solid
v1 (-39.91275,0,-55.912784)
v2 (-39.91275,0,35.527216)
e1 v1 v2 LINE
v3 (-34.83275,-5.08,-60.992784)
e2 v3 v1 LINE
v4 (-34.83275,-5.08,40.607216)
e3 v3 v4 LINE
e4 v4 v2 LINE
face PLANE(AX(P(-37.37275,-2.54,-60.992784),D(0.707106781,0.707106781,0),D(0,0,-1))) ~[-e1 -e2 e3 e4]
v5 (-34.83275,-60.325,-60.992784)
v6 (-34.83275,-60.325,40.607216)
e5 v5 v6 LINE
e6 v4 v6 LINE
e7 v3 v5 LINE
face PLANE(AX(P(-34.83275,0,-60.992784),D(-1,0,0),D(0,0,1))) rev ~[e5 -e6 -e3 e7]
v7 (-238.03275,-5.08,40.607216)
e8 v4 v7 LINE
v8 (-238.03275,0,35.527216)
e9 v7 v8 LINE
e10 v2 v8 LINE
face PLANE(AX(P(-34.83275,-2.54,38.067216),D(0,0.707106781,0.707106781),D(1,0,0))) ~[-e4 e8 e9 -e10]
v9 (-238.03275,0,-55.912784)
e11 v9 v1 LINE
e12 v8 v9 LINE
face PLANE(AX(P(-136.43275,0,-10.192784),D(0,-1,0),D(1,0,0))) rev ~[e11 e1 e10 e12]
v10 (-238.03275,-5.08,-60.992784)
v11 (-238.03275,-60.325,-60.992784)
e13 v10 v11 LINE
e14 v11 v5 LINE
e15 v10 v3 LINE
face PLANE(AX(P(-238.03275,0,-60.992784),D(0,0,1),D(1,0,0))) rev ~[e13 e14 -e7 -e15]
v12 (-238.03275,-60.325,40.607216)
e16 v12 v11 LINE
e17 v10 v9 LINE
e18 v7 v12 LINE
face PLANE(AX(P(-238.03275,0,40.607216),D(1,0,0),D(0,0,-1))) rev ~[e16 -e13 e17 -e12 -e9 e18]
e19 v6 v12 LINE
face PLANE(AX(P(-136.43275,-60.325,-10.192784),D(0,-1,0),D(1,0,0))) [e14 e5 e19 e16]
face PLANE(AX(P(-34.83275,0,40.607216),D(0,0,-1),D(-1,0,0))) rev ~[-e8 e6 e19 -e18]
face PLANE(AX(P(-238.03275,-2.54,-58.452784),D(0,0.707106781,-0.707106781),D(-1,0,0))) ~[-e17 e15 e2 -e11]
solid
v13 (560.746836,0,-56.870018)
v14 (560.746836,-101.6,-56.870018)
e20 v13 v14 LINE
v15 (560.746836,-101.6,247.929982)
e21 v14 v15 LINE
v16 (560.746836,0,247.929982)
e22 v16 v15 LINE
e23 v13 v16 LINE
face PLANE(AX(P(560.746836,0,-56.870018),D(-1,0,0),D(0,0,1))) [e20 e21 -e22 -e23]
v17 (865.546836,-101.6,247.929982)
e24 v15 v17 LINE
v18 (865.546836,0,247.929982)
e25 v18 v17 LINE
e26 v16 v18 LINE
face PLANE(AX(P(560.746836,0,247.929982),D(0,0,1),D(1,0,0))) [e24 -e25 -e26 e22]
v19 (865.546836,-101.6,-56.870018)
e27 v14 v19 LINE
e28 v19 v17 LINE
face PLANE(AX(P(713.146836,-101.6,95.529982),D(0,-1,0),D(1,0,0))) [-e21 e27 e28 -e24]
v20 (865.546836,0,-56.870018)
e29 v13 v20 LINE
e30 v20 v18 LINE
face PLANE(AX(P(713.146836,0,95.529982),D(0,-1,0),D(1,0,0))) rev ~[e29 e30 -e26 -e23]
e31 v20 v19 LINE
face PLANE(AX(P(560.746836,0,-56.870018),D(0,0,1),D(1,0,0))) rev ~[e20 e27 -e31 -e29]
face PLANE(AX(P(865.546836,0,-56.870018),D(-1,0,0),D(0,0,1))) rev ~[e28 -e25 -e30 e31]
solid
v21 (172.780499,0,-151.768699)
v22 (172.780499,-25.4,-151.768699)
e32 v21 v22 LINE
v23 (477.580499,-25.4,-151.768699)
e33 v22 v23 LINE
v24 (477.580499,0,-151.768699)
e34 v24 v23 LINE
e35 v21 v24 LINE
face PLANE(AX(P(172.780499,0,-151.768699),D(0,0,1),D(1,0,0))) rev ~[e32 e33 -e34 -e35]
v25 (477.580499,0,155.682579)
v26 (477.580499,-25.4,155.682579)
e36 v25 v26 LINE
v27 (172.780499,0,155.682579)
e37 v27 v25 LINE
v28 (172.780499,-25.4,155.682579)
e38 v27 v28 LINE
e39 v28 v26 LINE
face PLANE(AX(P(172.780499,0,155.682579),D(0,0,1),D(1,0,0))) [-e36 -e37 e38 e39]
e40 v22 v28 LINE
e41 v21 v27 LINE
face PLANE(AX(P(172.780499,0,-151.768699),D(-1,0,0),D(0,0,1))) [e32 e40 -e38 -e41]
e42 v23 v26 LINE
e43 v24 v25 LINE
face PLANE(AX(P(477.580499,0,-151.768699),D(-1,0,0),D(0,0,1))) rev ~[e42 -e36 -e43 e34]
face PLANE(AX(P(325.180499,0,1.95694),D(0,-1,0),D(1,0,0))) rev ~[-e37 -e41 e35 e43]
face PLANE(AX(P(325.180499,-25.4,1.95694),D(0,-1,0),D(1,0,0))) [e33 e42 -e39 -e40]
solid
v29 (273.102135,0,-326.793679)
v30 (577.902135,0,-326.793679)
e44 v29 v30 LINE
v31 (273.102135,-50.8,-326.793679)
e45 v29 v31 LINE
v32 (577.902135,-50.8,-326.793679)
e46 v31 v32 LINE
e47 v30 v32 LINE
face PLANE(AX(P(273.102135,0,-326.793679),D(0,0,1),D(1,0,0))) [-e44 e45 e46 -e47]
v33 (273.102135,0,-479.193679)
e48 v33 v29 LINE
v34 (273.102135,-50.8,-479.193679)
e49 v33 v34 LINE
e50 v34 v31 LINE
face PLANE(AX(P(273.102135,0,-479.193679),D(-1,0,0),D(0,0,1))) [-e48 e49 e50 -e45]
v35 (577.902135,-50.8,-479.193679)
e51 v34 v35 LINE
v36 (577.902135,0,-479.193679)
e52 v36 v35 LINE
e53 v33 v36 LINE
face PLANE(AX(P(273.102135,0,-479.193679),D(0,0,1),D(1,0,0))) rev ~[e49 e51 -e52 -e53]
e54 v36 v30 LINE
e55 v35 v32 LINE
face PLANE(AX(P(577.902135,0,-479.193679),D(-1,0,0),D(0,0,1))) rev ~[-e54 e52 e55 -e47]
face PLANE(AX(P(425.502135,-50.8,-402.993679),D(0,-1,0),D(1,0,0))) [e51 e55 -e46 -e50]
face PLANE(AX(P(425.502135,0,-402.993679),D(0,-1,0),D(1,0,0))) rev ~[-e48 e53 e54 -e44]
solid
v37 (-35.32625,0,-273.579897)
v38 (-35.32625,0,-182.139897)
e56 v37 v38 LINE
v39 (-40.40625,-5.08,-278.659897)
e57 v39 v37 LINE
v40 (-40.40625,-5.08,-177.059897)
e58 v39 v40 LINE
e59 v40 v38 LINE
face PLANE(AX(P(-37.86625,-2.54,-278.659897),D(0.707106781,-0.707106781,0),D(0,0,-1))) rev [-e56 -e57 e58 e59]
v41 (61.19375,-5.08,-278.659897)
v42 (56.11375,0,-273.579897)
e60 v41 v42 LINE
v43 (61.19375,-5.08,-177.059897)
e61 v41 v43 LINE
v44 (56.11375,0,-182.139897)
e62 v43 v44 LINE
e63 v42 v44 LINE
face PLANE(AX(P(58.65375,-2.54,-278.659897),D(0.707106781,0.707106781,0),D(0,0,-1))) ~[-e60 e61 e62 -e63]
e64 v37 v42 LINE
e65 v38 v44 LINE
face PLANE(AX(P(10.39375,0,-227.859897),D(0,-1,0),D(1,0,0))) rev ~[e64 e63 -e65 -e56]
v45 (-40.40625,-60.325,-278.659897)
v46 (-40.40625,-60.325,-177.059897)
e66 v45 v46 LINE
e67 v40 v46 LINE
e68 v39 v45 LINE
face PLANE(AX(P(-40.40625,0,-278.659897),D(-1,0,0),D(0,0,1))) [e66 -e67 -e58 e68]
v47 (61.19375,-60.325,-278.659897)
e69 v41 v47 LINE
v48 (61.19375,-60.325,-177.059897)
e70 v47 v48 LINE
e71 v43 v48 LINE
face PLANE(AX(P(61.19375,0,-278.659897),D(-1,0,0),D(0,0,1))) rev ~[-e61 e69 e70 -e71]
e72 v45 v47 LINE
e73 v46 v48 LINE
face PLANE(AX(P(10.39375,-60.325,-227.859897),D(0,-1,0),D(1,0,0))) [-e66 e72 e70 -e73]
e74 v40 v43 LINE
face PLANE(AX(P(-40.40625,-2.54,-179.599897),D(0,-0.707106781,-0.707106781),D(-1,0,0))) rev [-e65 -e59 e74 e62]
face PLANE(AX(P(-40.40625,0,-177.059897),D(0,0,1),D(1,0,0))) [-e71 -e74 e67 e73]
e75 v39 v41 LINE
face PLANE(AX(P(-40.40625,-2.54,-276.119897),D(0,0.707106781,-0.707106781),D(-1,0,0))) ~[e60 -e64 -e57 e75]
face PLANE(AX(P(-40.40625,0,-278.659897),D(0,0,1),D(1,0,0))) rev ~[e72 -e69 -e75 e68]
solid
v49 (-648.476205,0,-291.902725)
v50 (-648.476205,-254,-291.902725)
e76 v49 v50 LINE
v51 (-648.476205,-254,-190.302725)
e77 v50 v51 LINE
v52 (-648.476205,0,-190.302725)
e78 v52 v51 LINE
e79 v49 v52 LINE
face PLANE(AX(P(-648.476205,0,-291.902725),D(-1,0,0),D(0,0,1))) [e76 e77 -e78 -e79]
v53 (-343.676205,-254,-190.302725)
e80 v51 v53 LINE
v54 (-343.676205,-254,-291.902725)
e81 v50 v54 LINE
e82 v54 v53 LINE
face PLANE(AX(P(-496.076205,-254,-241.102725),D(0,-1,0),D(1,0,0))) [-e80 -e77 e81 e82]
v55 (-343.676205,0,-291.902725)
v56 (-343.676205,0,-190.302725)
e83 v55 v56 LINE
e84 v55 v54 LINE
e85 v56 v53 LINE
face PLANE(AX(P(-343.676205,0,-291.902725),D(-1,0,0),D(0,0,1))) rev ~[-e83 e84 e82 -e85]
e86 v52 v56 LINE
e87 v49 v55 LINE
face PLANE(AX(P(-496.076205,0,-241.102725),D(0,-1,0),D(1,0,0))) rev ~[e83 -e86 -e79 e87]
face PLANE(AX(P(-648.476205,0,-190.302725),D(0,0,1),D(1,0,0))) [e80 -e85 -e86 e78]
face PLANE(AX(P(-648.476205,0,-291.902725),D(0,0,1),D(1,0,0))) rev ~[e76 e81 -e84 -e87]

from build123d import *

# Parameters (mm, degrees)
F1_DEPTH  = 60.325
F2_SIZE   = 5.08
F3_W      = 304.8
F3_H      = 307.4512779713
F4_DEPTH  = 25.4
F5_W      = 304.8
F5_H      = 304.8
F6_DEPTH  = 101.6
F7_W      = 101.6
F7_H      = 101.6
F8_DEPTH  = 60.325
F9_SIZE   = 5.08
F10_W     = 304.8
F10_H     = 152.4
F11_DEPTH = 50.8
F12_W     = 304.8
F12_H     = 101.6
F13_DEPTH = 254


with BuildPart() as f1:
    # F0 (on Front) → F1 (new body)
    with BuildSketch(Plane.XZ):
        Polygon((-34.8327495575, 40.6072164297), (-238.0327495575, 40.6072164297), (-238.0327495575, -60.9927835703), (-135.3522986174, -60.9927835703), (-34.8327495575, -60.9927835703), align=None)
    extrude(amount=F1_DEPTH)

    # F2
    f2_edges = [f1.edges().sort_by_distance(p)[0] for p in [
        (-136.43275, 0, -60.992784),
        (-136.43275, 0, 40.607216),
        (-34.83275, 0, -10.192784),
    ]]
    chamfer(f2_edges, length=F2_SIZE)


with BuildPart() as f4:
    # F3 (on Front) → F4 (new body)
    with BuildSketch(Plane.XZ):
        with Locations((325.1804988623, 1.9569396973)):
            Rectangle(F3_W, F3_H)
    extrude(amount=F4_DEPTH)


with BuildPart() as f6:
    # F5 (on Front) → F6 (new body)
    with BuildSketch(Plane.XZ):
        with Locations((713.1468355656, 95.5299821684)):
            Rectangle(F5_W, F5_H)
    extrude(amount=F6_DEPTH)


with BuildPart() as f8:
    # F7 (on Front) → F8 (new body)
    with BuildSketch(Plane.XZ):
        with Locations((10.3937499225, -227.8598965335)):
            Rectangle(F7_W, F7_H)
    extrude(amount=F8_DEPTH)

    # F9
    f9_edges = [f8.edges().sort_by_distance(p)[0] for p in [
        (61.19375, 0, -227.859897),
        (10.39375, 0, -278.659897),
        (-40.40625, 0, -227.859897),
        (10.39375, 0, -177.059897),
    ]]
    chamfer(f9_edges, length=F9_SIZE)


with BuildPart() as f11:
    # F10 (on Front) → F11 (new body)
    with BuildSketch(Plane.XZ):
        with Locations((425.5021352335, -402.9936790466)):
            Rectangle(F10_W, F10_H)
    extrude(amount=F11_DEPTH)


with BuildPart() as f13:
    # F12 (on Front) → F13 (new body)
    with BuildSketch(Plane.XZ):
        with Locations((-496.0762047155, -241.1027252674)):
            Rectangle(F12_W, F12_H)
    extrude(amount=F13_DEPTH)


solid = Compound([f1.part, f4.part, f6.part, f8.part, f11.part, f13.part])
